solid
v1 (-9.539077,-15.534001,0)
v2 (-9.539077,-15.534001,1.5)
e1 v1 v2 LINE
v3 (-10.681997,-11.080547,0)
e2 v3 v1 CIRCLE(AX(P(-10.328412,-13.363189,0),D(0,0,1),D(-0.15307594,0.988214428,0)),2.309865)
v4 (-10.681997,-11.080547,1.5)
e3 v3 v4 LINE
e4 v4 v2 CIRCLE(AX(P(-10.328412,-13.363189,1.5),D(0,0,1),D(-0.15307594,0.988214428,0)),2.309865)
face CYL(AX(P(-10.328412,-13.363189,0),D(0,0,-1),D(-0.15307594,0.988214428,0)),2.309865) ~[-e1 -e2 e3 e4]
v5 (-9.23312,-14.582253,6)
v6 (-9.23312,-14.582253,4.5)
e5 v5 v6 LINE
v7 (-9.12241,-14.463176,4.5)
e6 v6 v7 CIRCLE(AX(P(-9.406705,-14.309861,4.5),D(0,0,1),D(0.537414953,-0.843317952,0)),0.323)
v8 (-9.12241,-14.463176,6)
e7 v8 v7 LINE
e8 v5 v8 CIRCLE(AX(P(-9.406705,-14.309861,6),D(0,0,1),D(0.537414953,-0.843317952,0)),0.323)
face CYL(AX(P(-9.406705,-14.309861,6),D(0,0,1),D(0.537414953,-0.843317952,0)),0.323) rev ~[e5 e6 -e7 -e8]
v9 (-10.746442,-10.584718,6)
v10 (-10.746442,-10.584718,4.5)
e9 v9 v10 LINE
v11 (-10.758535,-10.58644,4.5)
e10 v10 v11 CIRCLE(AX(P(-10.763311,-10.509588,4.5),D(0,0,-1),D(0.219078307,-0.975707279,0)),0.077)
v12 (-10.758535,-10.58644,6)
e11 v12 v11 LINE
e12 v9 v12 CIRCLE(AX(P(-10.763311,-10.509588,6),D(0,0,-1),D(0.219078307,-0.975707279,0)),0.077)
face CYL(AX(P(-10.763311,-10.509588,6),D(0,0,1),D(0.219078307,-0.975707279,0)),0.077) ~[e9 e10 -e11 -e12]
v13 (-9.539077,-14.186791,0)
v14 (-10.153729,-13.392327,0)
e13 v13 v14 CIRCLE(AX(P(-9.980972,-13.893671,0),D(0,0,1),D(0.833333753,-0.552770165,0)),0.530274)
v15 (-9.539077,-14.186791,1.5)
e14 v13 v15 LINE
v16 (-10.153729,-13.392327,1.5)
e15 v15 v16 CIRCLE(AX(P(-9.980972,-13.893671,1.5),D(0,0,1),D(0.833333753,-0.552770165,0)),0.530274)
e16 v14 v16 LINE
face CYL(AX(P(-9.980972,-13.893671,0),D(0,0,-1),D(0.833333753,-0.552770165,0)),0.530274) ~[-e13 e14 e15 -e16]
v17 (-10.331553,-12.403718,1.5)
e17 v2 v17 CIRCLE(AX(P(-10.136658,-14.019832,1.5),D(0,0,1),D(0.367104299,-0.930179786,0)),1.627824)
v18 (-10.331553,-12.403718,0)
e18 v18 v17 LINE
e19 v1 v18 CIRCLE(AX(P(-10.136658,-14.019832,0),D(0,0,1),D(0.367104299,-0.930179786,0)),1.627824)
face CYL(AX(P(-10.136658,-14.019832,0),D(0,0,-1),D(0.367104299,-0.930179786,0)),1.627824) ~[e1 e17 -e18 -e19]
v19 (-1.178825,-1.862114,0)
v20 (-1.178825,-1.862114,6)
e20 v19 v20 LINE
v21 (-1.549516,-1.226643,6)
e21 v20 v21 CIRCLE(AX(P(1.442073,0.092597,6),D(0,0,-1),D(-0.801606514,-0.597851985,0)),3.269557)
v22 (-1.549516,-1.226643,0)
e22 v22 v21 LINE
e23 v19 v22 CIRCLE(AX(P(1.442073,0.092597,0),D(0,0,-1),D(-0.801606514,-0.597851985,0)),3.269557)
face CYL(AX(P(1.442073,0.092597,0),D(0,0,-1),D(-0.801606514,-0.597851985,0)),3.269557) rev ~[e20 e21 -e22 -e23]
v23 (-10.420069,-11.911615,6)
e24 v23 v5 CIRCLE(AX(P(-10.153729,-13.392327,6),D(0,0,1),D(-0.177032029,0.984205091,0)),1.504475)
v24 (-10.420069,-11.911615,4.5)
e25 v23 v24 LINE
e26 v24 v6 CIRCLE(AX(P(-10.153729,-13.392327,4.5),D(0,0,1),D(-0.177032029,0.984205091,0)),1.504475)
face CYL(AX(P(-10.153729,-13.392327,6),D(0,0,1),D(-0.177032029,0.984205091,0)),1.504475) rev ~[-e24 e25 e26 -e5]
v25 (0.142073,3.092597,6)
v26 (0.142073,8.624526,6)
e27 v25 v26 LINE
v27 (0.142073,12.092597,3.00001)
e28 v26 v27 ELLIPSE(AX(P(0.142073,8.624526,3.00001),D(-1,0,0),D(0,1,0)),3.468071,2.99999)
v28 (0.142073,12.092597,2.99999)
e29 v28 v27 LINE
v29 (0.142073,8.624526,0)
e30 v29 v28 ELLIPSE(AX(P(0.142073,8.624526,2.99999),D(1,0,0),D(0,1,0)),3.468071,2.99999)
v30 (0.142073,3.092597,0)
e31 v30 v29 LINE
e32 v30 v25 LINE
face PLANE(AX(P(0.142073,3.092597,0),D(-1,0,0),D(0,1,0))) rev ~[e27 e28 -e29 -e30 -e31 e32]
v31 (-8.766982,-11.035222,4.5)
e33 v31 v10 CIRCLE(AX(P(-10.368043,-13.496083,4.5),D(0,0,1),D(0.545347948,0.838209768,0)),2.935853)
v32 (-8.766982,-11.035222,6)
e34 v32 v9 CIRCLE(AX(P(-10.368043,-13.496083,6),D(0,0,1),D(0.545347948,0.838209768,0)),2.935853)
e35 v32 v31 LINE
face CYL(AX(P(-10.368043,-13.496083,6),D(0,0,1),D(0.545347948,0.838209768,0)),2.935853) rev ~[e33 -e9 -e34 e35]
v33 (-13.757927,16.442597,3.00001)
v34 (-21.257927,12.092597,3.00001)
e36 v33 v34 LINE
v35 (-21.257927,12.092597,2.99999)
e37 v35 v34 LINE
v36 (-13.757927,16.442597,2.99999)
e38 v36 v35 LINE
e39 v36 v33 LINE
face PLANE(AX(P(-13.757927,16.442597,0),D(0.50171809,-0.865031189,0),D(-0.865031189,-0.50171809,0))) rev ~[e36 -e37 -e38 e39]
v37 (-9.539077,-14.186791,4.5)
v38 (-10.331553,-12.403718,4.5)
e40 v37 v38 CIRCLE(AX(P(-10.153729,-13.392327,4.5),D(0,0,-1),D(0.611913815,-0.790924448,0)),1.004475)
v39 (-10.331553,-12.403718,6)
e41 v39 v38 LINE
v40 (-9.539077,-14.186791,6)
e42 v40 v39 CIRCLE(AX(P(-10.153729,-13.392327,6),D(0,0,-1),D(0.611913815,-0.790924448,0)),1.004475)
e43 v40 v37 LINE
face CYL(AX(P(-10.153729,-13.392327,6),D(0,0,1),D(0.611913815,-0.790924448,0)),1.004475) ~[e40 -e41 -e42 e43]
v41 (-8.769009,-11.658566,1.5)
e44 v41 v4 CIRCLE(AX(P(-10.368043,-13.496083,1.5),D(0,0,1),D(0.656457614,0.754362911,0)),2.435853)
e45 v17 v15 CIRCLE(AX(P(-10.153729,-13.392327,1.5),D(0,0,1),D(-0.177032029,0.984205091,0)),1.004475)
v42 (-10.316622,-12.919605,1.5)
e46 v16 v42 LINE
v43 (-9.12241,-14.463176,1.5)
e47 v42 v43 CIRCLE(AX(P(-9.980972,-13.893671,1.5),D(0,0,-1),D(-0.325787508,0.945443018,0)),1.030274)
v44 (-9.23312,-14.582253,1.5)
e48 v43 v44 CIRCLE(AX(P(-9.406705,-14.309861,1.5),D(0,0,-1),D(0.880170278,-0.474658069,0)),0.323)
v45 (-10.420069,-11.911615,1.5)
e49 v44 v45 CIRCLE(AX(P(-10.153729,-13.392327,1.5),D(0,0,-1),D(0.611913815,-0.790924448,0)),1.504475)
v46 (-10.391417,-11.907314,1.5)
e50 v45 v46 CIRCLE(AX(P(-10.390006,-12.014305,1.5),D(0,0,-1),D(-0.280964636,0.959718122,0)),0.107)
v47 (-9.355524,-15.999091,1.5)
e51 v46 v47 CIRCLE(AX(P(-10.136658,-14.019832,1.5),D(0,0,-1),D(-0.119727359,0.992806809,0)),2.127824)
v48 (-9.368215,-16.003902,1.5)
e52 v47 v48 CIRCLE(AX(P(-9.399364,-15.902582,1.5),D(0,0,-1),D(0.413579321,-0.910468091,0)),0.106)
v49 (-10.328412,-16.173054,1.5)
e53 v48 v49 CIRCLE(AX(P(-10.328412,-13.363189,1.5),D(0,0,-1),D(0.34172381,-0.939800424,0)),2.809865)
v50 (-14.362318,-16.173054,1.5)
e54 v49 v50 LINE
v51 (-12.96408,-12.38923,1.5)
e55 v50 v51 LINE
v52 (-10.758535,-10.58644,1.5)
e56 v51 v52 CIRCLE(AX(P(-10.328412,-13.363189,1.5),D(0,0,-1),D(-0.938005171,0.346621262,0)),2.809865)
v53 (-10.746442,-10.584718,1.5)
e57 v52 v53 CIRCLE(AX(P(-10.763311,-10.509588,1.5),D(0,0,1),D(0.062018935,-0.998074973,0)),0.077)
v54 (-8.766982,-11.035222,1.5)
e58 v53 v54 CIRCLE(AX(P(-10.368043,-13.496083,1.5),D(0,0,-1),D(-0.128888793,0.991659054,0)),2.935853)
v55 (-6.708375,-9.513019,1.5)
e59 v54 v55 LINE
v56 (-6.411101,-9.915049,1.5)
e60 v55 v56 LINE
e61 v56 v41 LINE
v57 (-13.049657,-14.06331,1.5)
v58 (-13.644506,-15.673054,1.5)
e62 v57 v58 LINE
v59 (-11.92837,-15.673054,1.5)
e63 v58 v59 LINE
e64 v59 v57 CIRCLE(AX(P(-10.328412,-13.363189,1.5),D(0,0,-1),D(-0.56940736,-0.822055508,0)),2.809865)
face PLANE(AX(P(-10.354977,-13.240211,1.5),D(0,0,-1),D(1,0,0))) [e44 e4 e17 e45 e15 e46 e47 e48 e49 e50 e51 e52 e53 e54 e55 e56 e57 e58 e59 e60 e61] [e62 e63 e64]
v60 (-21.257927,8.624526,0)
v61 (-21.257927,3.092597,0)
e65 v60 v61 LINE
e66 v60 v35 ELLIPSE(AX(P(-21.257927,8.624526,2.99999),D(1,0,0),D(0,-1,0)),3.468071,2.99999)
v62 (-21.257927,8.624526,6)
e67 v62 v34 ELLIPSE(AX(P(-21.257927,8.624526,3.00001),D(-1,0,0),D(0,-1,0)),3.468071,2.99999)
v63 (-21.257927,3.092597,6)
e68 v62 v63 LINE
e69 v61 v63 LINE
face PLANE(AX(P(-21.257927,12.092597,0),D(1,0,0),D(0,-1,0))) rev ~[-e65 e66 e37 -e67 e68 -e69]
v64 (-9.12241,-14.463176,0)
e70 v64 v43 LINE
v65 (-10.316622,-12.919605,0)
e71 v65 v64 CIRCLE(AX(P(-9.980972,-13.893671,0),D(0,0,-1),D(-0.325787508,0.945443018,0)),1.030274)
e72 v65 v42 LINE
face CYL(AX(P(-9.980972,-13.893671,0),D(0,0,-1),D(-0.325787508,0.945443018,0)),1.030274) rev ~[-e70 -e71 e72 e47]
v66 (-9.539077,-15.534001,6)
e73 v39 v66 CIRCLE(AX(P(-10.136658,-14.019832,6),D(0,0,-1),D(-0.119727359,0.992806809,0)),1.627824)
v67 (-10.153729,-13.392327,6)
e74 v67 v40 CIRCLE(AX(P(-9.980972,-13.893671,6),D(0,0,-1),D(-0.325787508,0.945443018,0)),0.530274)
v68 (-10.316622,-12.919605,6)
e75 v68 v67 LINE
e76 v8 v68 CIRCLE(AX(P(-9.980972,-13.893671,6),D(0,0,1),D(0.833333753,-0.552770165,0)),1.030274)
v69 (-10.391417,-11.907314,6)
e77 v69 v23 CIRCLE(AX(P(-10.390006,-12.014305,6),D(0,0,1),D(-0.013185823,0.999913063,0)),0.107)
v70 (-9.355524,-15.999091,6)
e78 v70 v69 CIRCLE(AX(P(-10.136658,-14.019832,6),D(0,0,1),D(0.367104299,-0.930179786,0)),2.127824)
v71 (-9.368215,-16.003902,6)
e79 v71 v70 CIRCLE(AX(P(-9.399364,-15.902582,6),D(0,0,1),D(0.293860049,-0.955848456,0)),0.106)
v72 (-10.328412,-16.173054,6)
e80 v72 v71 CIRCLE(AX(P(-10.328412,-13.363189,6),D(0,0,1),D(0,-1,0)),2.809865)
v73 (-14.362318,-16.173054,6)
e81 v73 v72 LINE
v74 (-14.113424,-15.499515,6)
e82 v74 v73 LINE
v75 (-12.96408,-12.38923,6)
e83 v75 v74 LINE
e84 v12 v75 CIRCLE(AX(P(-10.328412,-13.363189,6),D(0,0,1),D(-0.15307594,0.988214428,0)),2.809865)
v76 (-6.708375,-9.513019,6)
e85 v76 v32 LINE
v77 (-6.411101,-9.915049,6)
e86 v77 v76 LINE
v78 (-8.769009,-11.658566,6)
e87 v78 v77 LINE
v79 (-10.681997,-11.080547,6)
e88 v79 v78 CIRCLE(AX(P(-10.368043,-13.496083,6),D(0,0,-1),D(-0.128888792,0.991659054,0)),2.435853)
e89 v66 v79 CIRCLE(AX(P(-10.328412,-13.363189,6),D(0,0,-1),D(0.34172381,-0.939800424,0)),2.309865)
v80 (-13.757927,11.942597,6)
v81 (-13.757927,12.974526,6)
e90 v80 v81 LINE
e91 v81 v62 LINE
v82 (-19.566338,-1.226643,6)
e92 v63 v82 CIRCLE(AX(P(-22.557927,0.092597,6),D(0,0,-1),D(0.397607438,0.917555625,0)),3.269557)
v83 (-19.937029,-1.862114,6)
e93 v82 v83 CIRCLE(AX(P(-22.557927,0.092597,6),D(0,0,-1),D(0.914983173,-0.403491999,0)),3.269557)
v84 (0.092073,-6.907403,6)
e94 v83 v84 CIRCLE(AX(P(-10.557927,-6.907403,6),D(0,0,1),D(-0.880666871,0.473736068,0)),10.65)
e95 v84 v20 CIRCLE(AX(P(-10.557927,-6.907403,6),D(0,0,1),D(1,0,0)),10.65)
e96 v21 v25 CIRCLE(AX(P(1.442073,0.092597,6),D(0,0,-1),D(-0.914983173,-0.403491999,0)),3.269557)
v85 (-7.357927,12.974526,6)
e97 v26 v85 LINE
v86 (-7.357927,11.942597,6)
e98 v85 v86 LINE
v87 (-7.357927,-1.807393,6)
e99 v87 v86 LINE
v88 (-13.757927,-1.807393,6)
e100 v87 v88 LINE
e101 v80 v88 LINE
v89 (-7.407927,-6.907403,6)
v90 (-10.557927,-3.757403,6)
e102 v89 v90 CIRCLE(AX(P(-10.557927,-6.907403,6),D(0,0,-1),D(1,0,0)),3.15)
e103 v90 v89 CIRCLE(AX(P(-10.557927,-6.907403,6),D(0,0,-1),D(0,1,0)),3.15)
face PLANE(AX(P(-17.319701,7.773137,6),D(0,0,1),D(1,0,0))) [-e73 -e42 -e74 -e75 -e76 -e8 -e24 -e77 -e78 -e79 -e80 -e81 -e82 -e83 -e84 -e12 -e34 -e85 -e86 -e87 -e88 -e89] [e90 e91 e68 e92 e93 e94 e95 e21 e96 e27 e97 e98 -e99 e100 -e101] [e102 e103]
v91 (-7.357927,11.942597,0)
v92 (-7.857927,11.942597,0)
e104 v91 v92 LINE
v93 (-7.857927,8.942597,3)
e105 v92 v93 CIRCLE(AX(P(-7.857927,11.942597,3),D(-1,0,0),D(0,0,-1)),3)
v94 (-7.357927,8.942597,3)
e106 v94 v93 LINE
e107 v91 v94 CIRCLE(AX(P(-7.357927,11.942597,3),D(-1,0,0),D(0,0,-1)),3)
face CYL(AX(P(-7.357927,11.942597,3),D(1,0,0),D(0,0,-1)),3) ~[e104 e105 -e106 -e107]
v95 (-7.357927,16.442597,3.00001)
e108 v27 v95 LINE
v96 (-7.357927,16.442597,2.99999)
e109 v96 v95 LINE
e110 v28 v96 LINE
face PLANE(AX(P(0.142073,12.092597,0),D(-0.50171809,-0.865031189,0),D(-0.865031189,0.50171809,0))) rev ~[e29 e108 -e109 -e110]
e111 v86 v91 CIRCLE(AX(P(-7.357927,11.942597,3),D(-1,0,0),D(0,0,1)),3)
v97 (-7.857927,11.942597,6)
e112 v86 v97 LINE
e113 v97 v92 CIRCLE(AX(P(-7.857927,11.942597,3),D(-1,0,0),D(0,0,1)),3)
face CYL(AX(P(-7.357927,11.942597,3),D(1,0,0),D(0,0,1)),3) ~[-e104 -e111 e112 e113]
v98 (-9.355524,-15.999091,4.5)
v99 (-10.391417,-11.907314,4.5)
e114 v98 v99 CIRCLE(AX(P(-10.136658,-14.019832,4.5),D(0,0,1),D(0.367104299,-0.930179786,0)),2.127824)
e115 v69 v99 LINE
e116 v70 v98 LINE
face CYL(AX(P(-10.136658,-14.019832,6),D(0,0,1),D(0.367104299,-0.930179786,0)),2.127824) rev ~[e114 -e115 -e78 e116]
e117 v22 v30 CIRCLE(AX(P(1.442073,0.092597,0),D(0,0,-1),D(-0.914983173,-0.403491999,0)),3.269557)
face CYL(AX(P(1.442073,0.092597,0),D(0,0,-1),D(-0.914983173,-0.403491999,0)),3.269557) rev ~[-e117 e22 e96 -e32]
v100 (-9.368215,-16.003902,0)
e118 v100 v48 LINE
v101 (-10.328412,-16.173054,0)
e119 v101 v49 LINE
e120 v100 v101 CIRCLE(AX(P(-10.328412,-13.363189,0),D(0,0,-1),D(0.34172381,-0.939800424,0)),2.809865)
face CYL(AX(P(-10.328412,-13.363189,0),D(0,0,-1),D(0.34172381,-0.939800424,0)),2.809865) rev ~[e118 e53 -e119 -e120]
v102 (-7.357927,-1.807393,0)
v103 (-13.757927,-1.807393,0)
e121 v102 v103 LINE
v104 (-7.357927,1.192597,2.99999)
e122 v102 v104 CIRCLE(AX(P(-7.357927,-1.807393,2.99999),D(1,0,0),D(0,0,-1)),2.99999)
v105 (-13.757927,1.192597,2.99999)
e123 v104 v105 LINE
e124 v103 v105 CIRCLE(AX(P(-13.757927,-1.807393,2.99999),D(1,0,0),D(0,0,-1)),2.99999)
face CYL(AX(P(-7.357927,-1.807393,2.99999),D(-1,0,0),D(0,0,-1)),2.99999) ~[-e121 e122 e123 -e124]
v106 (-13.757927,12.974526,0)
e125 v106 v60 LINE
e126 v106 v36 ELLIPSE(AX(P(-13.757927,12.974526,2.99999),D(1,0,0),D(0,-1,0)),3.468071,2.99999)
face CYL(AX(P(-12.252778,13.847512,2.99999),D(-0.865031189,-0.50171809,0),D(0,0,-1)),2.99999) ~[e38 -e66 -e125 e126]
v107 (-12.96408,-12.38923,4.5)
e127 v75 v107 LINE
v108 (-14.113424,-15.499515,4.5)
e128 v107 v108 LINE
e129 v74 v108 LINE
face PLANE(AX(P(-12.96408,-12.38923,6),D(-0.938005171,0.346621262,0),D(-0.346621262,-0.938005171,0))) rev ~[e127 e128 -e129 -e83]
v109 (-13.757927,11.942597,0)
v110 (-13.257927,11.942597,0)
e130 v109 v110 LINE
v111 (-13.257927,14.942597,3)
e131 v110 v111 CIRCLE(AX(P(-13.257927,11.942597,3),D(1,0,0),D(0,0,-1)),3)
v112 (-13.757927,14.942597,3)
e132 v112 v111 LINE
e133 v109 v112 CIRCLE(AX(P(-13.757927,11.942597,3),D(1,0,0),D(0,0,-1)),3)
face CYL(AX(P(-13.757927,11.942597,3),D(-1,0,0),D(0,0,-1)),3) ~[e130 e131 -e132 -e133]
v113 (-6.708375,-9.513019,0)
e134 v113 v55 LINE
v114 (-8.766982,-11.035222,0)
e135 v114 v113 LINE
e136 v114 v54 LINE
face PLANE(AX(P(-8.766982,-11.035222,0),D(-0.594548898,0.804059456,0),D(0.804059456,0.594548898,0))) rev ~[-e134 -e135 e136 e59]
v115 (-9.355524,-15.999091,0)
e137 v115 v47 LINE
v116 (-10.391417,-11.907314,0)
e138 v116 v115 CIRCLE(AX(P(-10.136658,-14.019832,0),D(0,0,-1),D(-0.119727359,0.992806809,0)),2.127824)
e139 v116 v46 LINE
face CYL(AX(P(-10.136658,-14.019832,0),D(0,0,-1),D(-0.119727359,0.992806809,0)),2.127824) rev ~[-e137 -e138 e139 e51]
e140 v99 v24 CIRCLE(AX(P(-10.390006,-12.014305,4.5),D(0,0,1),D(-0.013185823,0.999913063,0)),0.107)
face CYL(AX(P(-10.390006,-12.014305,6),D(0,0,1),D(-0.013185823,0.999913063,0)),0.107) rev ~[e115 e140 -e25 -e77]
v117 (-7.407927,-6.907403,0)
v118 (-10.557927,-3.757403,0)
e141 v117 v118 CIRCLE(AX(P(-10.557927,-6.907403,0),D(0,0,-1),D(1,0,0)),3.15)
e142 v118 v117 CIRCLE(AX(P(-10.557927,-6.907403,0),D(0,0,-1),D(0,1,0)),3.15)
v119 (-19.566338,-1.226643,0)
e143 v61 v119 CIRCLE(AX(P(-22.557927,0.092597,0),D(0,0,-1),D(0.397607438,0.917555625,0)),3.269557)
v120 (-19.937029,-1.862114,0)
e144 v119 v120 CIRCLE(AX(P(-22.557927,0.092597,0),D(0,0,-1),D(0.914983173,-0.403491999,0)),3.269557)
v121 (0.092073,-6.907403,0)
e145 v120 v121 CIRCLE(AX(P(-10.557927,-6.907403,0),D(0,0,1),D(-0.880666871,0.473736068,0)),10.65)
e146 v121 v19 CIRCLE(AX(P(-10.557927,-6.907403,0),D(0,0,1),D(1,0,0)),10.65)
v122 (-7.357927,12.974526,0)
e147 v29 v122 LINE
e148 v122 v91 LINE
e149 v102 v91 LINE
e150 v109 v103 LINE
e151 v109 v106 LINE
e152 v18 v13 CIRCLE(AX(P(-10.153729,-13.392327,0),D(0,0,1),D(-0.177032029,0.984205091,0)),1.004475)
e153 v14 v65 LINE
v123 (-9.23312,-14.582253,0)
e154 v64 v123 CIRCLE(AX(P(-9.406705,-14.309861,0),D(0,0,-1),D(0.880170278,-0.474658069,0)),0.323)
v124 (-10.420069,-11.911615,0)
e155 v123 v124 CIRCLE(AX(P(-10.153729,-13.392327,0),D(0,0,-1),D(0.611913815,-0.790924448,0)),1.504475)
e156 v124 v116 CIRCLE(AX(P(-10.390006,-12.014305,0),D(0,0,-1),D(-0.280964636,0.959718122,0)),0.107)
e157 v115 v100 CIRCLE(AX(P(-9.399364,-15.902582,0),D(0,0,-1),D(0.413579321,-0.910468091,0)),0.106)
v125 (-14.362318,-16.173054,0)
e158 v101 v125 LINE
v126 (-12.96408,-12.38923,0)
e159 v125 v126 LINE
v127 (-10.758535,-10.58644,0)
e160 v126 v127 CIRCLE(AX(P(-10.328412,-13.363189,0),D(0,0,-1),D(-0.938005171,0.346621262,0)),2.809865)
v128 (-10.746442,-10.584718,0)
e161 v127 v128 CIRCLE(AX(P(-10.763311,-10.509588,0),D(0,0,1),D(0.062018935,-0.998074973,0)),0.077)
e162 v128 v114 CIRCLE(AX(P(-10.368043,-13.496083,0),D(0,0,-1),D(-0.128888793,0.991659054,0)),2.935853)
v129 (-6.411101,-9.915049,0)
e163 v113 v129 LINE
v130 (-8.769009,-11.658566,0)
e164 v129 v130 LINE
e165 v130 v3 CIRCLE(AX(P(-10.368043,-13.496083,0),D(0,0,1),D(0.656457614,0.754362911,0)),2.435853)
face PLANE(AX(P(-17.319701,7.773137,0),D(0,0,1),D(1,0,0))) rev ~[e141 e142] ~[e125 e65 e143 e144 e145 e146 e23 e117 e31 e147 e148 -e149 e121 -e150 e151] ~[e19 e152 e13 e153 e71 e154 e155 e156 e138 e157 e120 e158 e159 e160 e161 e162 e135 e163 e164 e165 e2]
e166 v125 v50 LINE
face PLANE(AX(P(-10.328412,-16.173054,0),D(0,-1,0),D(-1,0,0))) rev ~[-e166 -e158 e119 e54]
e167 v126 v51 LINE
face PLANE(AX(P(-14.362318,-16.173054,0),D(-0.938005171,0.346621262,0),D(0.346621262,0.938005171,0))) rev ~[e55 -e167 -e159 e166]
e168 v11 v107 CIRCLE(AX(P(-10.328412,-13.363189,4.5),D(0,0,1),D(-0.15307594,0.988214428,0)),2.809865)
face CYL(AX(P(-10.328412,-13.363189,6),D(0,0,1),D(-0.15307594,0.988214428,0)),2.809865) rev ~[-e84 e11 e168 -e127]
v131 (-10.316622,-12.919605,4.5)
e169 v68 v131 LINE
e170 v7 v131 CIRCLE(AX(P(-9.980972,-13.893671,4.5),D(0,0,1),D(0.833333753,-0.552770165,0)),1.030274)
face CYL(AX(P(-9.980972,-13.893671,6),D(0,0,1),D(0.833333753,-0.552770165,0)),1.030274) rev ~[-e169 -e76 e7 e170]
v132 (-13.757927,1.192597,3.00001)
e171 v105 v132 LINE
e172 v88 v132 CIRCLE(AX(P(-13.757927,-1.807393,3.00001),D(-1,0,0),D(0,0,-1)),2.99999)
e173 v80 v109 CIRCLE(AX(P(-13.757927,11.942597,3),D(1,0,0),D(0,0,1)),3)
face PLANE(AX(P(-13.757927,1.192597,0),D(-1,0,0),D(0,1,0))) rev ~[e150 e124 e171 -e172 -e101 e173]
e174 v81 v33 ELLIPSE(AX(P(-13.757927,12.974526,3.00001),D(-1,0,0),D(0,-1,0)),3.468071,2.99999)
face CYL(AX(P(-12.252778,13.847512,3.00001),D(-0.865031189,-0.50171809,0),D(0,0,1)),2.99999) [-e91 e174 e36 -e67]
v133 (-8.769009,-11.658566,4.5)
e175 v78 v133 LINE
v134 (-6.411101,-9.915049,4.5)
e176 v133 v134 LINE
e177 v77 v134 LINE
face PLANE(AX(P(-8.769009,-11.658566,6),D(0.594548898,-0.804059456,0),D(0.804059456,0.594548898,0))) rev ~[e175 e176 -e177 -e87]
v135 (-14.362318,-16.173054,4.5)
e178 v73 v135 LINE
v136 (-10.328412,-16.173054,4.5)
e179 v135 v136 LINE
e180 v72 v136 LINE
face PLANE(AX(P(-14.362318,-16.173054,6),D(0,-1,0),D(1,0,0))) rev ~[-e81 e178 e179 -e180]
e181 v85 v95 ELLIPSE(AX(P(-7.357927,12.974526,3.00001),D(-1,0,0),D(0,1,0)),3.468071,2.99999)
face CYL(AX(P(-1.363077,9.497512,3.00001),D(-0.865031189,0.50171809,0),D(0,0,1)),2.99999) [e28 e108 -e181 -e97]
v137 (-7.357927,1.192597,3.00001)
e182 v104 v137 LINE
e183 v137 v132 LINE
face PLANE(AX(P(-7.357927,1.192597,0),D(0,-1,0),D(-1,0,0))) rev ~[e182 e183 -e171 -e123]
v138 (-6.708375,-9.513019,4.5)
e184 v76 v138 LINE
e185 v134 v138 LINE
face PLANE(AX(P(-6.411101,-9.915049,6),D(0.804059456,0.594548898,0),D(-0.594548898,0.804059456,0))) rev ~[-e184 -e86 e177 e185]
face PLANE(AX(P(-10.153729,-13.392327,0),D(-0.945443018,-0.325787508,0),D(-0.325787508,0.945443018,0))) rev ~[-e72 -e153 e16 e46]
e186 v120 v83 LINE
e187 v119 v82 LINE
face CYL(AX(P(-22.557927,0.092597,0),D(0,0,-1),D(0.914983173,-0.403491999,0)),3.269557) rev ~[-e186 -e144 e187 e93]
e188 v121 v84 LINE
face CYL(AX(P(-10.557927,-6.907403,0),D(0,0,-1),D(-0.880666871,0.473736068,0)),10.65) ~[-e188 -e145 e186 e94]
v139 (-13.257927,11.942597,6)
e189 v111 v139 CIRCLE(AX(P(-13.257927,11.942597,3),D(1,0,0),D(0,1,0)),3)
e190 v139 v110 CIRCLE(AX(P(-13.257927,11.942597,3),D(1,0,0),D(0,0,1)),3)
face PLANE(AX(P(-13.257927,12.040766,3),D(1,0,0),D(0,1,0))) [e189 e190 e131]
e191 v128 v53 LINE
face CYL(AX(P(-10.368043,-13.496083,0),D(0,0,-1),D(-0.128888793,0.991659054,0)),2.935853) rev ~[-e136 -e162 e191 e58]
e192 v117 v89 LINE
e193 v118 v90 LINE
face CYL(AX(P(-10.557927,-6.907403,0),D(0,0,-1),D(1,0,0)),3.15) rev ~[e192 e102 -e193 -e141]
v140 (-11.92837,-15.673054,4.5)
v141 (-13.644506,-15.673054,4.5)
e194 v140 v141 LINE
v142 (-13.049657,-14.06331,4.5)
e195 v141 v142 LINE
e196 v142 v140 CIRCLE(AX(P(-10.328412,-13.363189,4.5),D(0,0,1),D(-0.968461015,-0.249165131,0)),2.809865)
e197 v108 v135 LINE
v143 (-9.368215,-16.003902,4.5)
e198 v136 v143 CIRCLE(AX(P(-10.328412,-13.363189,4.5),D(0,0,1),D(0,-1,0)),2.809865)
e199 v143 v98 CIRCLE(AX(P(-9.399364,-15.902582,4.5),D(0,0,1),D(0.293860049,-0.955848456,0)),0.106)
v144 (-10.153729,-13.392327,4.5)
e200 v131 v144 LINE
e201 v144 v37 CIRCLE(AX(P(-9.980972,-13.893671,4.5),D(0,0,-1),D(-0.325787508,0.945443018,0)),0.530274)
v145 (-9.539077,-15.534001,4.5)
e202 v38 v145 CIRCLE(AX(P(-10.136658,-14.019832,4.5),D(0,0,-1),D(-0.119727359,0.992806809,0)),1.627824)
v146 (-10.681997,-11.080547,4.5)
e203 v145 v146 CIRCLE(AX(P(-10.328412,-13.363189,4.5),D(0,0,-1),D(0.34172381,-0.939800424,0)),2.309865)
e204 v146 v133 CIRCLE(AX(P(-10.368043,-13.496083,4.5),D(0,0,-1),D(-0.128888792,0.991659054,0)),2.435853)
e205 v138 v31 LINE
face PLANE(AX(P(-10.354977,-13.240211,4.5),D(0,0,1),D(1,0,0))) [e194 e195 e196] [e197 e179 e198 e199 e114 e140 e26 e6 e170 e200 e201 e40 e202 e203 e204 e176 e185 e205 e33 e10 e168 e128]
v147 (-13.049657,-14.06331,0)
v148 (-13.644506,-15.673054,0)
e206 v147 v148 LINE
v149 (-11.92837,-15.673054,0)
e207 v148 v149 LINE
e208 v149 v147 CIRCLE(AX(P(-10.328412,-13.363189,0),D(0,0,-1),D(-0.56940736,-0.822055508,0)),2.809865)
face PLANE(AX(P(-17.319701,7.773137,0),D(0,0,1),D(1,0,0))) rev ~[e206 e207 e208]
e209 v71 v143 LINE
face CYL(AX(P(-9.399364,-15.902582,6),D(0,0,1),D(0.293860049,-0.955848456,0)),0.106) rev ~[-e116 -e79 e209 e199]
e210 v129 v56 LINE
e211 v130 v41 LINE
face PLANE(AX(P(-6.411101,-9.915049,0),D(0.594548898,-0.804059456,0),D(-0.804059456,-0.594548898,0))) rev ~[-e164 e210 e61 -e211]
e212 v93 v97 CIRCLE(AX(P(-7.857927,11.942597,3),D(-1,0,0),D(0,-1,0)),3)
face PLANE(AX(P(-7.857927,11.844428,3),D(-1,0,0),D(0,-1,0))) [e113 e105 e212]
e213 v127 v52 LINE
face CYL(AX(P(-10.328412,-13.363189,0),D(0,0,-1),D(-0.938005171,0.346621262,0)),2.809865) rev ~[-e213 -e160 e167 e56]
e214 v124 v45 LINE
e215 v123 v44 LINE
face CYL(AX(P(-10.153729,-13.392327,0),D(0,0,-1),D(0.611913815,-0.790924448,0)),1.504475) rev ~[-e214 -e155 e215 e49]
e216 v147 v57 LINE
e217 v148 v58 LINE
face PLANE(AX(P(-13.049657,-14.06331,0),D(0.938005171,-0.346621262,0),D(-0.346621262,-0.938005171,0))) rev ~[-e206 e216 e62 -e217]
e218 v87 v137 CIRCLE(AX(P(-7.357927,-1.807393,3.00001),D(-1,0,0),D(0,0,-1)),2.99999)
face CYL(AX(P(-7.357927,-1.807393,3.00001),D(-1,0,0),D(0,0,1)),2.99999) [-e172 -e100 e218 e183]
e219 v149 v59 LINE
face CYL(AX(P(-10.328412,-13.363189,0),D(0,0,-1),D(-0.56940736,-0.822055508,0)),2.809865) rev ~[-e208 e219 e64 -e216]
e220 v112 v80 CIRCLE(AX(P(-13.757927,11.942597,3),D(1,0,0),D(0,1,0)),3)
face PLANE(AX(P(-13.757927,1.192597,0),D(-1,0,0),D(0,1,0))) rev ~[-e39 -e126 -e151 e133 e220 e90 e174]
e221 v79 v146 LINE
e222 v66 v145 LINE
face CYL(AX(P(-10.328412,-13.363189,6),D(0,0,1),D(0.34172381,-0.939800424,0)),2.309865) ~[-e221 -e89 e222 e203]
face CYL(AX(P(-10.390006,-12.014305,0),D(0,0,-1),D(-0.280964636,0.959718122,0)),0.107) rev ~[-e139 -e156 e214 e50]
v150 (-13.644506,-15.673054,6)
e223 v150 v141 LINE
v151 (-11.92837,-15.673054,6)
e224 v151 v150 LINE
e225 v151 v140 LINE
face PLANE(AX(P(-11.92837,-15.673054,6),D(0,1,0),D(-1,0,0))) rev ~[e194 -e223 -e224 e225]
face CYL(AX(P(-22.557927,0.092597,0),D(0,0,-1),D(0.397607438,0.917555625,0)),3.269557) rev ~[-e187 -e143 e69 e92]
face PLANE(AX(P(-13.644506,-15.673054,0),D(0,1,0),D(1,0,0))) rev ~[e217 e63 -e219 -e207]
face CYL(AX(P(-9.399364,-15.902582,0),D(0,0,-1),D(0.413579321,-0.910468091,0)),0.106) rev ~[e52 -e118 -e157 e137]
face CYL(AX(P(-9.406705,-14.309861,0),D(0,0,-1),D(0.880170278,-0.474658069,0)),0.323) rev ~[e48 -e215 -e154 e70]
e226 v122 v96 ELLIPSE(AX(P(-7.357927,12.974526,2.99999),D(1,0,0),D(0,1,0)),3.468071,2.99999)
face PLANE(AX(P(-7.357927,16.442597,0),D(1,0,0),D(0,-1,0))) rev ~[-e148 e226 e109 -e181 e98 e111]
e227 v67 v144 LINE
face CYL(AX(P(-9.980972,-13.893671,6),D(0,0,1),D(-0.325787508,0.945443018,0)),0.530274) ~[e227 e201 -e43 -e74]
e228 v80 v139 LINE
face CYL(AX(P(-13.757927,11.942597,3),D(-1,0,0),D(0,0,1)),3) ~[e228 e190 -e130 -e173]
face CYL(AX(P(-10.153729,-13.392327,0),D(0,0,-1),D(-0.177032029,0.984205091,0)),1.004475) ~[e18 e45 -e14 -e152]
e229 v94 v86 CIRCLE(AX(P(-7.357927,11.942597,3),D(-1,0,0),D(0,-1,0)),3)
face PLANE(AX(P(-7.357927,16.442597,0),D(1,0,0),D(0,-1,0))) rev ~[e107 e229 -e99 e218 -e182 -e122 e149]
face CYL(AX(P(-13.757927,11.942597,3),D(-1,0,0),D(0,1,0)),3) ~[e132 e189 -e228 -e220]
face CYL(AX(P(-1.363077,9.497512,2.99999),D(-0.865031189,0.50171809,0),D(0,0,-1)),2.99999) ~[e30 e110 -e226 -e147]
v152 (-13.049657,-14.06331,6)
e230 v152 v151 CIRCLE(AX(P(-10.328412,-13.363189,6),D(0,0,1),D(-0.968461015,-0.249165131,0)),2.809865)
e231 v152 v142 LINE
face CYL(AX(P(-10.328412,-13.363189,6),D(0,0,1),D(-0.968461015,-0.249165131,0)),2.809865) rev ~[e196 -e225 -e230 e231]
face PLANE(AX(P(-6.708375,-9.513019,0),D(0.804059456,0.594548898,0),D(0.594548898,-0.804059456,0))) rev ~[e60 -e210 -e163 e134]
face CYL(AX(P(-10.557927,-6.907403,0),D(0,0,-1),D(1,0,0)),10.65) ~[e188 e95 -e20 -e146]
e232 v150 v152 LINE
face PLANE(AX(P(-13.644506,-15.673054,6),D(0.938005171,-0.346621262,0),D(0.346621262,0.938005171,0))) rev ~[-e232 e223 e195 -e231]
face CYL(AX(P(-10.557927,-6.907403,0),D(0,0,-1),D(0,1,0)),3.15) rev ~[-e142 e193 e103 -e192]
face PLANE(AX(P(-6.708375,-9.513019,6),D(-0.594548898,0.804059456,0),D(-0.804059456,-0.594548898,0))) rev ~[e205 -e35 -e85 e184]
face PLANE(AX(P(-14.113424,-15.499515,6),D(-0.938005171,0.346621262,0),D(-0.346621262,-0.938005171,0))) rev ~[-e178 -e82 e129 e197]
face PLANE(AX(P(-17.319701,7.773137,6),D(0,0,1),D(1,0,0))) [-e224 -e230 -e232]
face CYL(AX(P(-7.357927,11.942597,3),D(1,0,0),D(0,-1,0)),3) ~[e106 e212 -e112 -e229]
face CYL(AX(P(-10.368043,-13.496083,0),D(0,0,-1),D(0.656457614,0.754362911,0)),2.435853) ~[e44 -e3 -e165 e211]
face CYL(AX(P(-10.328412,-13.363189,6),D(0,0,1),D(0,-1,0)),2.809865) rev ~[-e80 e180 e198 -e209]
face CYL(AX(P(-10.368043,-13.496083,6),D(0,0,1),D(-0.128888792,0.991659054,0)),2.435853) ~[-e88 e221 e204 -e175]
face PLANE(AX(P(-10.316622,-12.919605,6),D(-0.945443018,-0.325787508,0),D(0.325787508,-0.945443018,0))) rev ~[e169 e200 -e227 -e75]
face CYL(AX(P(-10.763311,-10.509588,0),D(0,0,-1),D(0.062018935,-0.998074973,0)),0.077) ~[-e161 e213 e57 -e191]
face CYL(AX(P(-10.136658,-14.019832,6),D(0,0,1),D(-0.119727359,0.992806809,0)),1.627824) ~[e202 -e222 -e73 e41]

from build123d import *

# Parameters (mm, degrees)
F1_DEPTH  = 6
F3_DEPTH  = 0.5
F5_DEPTH  = 0.5
F6_R      = 2.99999
F7_R      = 2.99999
F9_DEPTH  = 1.5
F11_DEPTH = 1.5


# Not quite as in the source:
# - a fillet or chamfer is up to 0.001 mm smaller than in the source, because OpenCascade refuses the exact size


with BuildPart() as f1:
    # F0 (on Top) → F1 (new body)
    with BuildSketch(Plane.XY):
        with BuildLine():
            ThreePointArc((-21.257927263, 3.0925971456), (-19.5135237331, 1.2849088277), (-19.5663380414, -1.2266427602))
            ThreePointArc((-19.5663380414, -1.2266427602), (-17.0596555887, 1.5276447909), (-13.757927263, 3.2504758611))
            Line((-13.757927263, 3.2504758611), (-13.757927263, 16.4425971456))
            Line((-13.757927263, 16.4425971456), (-21.257927263, 12.0925971456))
            Line((-21.257927263, 12.0925971456), (-21.257927263, 3.0925971456))
        make_face()
        with BuildLine():
            ThreePointArc((-19.937029438, -1.8621137259), (-13.1593751133, -17.2347921219), (0.092072737, -6.9074028544))
            ThreePointArc((0.092072737, -6.9074028544), (-0.2305379955, -4.3059550041), (-1.178825088, -1.8621137259))
            ThreePointArc((-1.178825088, -1.8621137259), (-1.3821012217, -1.5548376637), (-1.5495164847, -1.2266427602))
            ThreePointArc((-1.5495164847, -1.2266427602), (-4.0561989374, 1.5276447909), (-7.357927263, 3.2504758611))
            Line((-7.357927263, 3.2504758611), (-7.357927263, 1.1925971456))
            Line((-7.357927263, 1.1925971456), (-10.557927263, 1.1925971456))
            Line((-10.557927263, 1.1925971456), (-13.757927263, 1.1925971456))
            Line((-13.757927263, 1.1925971456), (-13.757927263, 3.2504758611))
            ThreePointArc((-13.757927263, 3.2504758611), (-17.0596555887, 1.5276447909), (-19.5663380414, -1.2266427602))
            ThreePointArc((-19.5663380414, -1.2266427602), (-19.7337533043, -1.5548376637), (-19.937029438, -1.8621137259))
        make_face()
        with BuildLine():
            ThreePointArc((-7.407927263, -6.9074028544), (-12.7853136237, -9.1347892152), (-10.557927263, -3.7574028544))
            ThreePointArc((-10.557927263, -3.7574028544), (-8.3305409023, -4.6800164937), (-7.407927263, -6.9074028544))
        make_face(mode=Mode.SUBTRACT)
        with BuildLine():
            ThreePointArc((-7.357927263, 3.2504758611), (-4.0561989374, 1.5276447909), (-1.5495164847, -1.2266427602))
            ThreePointArc((-1.5495164847, -1.2266427602), (-1.6023307929, 1.2849088277), (0.142072737, 3.0925971456))
            Line((0.142072737, 3.0925971456), (0.142072737, 12.0925971456))
            Line((0.142072737, 12.0925971456), (-7.357927263, 16.4425971456))
            Line((-7.357927263, 16.4425971456), (-7.357927263, 3.2504758611))
        make_face()
    extrude(amount=F1_DEPTH)

    # F2 (on face) → F3 (join)
    with BuildSketch(Plane.YZ.offset(-13.757927263)):
        with BuildLine():
            ThreePointArc((11.9425971456, 0), (14.0639174891, 0.8786796564), (14.9425971456, 3))
            ThreePointArc((14.9425971456, 3), (14.0639174891, 5.1213203436), (11.9425971456, 6))
            ThreePointArc((11.9425971456, 6), (8.9425971456, 3), (11.9425971456, 0))
        make_face()
    extrude(amount=F3_DEPTH)

    # F4 (on face) → F5 (join)
    with BuildSketch(Plane(origin=(-7.357927263, 0, 0), x_dir=(0, -1, 0), z_dir=(-1, 0, 0))):
        with BuildLine():
            ThreePointArc((-11.9425971456, 0), (-9.821276802, 0.8786796564), (-8.9425971456, 3))
            ThreePointArc((-8.9425971456, 3), (-9.821276802, 5.1213203436), (-11.9425971456, 6))
            ThreePointArc((-11.9425971456, 6), (-14.9425971456, 3), (-11.9425971456, 0))
        make_face()
    extrude(amount=F5_DEPTH)

    # F6 (radius 3 in the source; OpenCascade refuses exactly that, so slightly less here)
    f6_edges = [f1.edges().sort_by_distance(p)[0] for p in [
        (-10.557927, 1.192597, 0),
        (-10.557927, 1.192597, 6),
    ]]
    fillet(f6_edges, radius=F6_R)

    # F7 (radius 3 in the source; OpenCascade refuses exactly that, so slightly less here)
    f7_edges = [f1.edges().sort_by_distance(p)[0] for p in [
        (-3.607927, 14.267597, 6),
        (-3.607927, 14.267597, 0),
        (-17.507927, 14.267597, 6),
        (-17.507927, 14.267597, 0),
    ]]
    fillet(f7_edges, radius=F7_R)

    # F8 (on face) → F9 (cut)
    with BuildSketch(Plane.XY.offset(6)):
        with BuildLine():
            ThreePointArc((-10.3315528874, -12.4037176265), (-8.5586184667, -13.6203290978), (-9.5390766145, -15.534001419))
            ThreePointArc((-9.5390766145, -15.534001419), (-12.5657731947, -13.9373786235), (-10.6819972396, -11.0805473911))
            ThreePointArc((-10.6819972396, -11.0805473911), (-9.6634977684, -11.1643464321), (-8.7690087855, -11.6585659294))
            Line((-8.7690087855, -11.6585659294), (-6.4111007419, -9.9150485592))
            Line((-6.4111007419, -9.9150485592), (-6.7083751907, -9.5130188313))
            Line((-6.7083751907, -9.5130188313), (-8.7669816313, -11.0352224208))
            ThreePointArc((-8.7669816313, -11.0352224208), (-9.7165335049, -10.6334325304), (-10.7464416358, -10.5847178642))
            ThreePointArc((-10.7464416358, -10.5847178642), (-10.7524542145, -10.5858192208), (-10.7585352096, -10.5864401769))
            ThreePointArc((-10.7585352096, -10.5864401769), (-12.1066928754, -11.1876295757), (-12.9640803834, -12.3892303605))
            Line((-12.9640803834, -12.3892303605), (-14.113424494, -15.4995148073))
            Line((-14.113424494, -15.4995148073), (-14.3623176984, -16.1730543119))
            Line((-14.3623176984, -16.1730543119), (-13.6445064842, -16.1730543119))
            Line((-13.6445064842, -16.1730543119), (-10.3284124834, -16.1730543119))
            ThreePointArc((-10.3284124834, -16.1730543119), (-9.8409208438, -16.1304430443), (-9.3682147094, -16.0039016311))
            ThreePointArc((-9.3682147094, -16.0039016311), (-9.361792524, -16.0016997739), (-9.355524465, -15.9990913118))
            ThreePointArc((-9.355524465, -15.9990913118), (-8.073910256, -13.497618257), (-10.3914165669, -11.9073142221))
            ThreePointArc((-10.3914165669, -11.9073142221), (-10.4058889802, -11.9084903608), (-10.4200689017, -11.9116150811))
            ThreePointArc((-10.4200689017, -11.9116150811), (-11.528535351, -14.0033516217), (-9.233119707, -14.5822528616))
            ThreePointArc((-9.233119707, -14.5822528616), (-9.1701495178, -14.5297943991), (-9.1224097378, -14.46317572))
            ThreePointArc((-9.1224097378, -14.46317572), (-9.1661029488, -13.263231915), (-10.3166224177, -12.9196053972))
            Line((-10.3166224177, -12.9196053972), (-10.1537286636, -13.392326906))
            ThreePointArc((-10.1537286636, -13.392326906), (-9.561565173, -13.5691888225), (-9.5390766145, -14.1867906375))
            ThreePointArc((-9.5390766145, -14.1867906375), (-11.0716295176, -13.8002825215), (-10.3315528874, -12.4037176265))
        make_face()
        with BuildLine():
            ThreePointArc((-13.0496571933, -14.0633096924), (-12.6340614687, -14.9692167321), (-11.9283702953, -15.6730543119))
            Line((-11.9283702953, -15.6730543119), (-13.6445064842, -15.6730543119))
            Line((-13.6445064842, -15.6730543119), (-13.0496571933, -14.0633096924))
        make_face(mode=Mode.SUBTRACT)
    extrude(amount=-F9_DEPTH, mode=Mode.SUBTRACT)

    # F10 (on face) → F11 (cut)
    with BuildSketch(Plane(origin=(0, 0, 0), x_dir=(1, 0, 0), z_dir=(0, 0, -1))):
        with BuildLine():
            Line((-6.4111007419, 9.9150485592), (-8.7690087855, 11.6585659294))
            ThreePointArc((-8.7690087855, 11.6585659294), (-9.6634977684, 11.1643464321), (-10.6819972396, 11.0805473911))
            ThreePointArc((-10.6819972396, 11.0805473911), (-12.5657731947, 13.9373786235), (-9.5390766145, 15.534001419))
            ThreePointArc((-9.5390766145, 15.534001419), (-8.5586184667, 13.6203290978), (-10.3315528874, 12.4037176265))
            ThreePointArc((-10.3315528874, 12.4037176265), (-11.0716295176, 13.8002825215), (-9.5390766145, 14.1867906375))
            ThreePointArc((-9.5390766145, 14.1867906375), (-9.561565173, 13.5691888225), (-10.1537286636, 13.392326906))
            Line((-10.1537286636, 13.392326906), (-10.3166224177, 12.9196053972))
            ThreePointArc((-10.3166224177, 12.9196053972), (-9.1661029488, 13.263231915), (-9.1224097378, 14.46317572))
            ThreePointArc((-9.1224097378, 14.46317572), (-9.1701495178, 14.5297943991), (-9.233119707, 14.5822528616))
            ThreePointArc((-9.233119707, 14.5822528616), (-11.528535351, 14.0033516217), (-10.4200689017, 11.9116150811))
            ThreePointArc((-10.4200689017, 11.9116150811), (-10.4058889802, 11.9084903608), (-10.3914165669, 11.9073142221))
            ThreePointArc((-10.3914165669, 11.9073142221), (-8.073910256, 13.497618257), (-9.355524465, 15.9990913118))
            ThreePointArc((-9.355524465, 15.9990913118), (-9.361792524, 16.0016997739), (-9.3682147094, 16.0039016311))
            ThreePointArc((-9.3682147094, 16.0039016311), (-9.8409208438, 16.1304430443), (-10.3284124834, 16.1730543119))
            Line((-10.3284124834, 16.1730543119), (-14.3623176984, 16.1730543119))
            Line((-14.3623176984, 16.1730543119), (-12.9640803834, 12.3892303605))
            ThreePointArc((-12.9640803834, 12.3892303605), (-12.1066928754, 11.1876295757), (-10.7585352096, 10.5864401769))
            ThreePointArc((-10.7585352096, 10.5864401769), (-10.7524542145, 10.5858192208), (-10.7464416358, 10.5847178642))
            ThreePointArc((-10.7464416358, 10.5847178642), (-9.7165335049, 10.6334325304), (-8.7669816313, 11.0352224208))
            Line((-8.7669816313, 11.0352224208), (-6.7083751907, 9.5130188313))
            Line((-6.7083751907, 9.5130188313), (-6.4111007419, 9.9150485592))
        make_face()
        with BuildLine():
            ThreePointArc((-11.9283702953, 15.6730543119), (-12.6340614687, 14.9692167321), (-13.0496571933, 14.0633096924))
            Line((-13.0496571933, 14.0633096924), (-13.6445064842, 15.6730543119))
            Line((-13.6445064842, 15.6730543119), (-11.9283702953, 15.6730543119))
        make_face(mode=Mode.SUBTRACT)
    extrude(amount=-F11_DEPTH, mode=Mode.SUBTRACT)


solid = f1.part
